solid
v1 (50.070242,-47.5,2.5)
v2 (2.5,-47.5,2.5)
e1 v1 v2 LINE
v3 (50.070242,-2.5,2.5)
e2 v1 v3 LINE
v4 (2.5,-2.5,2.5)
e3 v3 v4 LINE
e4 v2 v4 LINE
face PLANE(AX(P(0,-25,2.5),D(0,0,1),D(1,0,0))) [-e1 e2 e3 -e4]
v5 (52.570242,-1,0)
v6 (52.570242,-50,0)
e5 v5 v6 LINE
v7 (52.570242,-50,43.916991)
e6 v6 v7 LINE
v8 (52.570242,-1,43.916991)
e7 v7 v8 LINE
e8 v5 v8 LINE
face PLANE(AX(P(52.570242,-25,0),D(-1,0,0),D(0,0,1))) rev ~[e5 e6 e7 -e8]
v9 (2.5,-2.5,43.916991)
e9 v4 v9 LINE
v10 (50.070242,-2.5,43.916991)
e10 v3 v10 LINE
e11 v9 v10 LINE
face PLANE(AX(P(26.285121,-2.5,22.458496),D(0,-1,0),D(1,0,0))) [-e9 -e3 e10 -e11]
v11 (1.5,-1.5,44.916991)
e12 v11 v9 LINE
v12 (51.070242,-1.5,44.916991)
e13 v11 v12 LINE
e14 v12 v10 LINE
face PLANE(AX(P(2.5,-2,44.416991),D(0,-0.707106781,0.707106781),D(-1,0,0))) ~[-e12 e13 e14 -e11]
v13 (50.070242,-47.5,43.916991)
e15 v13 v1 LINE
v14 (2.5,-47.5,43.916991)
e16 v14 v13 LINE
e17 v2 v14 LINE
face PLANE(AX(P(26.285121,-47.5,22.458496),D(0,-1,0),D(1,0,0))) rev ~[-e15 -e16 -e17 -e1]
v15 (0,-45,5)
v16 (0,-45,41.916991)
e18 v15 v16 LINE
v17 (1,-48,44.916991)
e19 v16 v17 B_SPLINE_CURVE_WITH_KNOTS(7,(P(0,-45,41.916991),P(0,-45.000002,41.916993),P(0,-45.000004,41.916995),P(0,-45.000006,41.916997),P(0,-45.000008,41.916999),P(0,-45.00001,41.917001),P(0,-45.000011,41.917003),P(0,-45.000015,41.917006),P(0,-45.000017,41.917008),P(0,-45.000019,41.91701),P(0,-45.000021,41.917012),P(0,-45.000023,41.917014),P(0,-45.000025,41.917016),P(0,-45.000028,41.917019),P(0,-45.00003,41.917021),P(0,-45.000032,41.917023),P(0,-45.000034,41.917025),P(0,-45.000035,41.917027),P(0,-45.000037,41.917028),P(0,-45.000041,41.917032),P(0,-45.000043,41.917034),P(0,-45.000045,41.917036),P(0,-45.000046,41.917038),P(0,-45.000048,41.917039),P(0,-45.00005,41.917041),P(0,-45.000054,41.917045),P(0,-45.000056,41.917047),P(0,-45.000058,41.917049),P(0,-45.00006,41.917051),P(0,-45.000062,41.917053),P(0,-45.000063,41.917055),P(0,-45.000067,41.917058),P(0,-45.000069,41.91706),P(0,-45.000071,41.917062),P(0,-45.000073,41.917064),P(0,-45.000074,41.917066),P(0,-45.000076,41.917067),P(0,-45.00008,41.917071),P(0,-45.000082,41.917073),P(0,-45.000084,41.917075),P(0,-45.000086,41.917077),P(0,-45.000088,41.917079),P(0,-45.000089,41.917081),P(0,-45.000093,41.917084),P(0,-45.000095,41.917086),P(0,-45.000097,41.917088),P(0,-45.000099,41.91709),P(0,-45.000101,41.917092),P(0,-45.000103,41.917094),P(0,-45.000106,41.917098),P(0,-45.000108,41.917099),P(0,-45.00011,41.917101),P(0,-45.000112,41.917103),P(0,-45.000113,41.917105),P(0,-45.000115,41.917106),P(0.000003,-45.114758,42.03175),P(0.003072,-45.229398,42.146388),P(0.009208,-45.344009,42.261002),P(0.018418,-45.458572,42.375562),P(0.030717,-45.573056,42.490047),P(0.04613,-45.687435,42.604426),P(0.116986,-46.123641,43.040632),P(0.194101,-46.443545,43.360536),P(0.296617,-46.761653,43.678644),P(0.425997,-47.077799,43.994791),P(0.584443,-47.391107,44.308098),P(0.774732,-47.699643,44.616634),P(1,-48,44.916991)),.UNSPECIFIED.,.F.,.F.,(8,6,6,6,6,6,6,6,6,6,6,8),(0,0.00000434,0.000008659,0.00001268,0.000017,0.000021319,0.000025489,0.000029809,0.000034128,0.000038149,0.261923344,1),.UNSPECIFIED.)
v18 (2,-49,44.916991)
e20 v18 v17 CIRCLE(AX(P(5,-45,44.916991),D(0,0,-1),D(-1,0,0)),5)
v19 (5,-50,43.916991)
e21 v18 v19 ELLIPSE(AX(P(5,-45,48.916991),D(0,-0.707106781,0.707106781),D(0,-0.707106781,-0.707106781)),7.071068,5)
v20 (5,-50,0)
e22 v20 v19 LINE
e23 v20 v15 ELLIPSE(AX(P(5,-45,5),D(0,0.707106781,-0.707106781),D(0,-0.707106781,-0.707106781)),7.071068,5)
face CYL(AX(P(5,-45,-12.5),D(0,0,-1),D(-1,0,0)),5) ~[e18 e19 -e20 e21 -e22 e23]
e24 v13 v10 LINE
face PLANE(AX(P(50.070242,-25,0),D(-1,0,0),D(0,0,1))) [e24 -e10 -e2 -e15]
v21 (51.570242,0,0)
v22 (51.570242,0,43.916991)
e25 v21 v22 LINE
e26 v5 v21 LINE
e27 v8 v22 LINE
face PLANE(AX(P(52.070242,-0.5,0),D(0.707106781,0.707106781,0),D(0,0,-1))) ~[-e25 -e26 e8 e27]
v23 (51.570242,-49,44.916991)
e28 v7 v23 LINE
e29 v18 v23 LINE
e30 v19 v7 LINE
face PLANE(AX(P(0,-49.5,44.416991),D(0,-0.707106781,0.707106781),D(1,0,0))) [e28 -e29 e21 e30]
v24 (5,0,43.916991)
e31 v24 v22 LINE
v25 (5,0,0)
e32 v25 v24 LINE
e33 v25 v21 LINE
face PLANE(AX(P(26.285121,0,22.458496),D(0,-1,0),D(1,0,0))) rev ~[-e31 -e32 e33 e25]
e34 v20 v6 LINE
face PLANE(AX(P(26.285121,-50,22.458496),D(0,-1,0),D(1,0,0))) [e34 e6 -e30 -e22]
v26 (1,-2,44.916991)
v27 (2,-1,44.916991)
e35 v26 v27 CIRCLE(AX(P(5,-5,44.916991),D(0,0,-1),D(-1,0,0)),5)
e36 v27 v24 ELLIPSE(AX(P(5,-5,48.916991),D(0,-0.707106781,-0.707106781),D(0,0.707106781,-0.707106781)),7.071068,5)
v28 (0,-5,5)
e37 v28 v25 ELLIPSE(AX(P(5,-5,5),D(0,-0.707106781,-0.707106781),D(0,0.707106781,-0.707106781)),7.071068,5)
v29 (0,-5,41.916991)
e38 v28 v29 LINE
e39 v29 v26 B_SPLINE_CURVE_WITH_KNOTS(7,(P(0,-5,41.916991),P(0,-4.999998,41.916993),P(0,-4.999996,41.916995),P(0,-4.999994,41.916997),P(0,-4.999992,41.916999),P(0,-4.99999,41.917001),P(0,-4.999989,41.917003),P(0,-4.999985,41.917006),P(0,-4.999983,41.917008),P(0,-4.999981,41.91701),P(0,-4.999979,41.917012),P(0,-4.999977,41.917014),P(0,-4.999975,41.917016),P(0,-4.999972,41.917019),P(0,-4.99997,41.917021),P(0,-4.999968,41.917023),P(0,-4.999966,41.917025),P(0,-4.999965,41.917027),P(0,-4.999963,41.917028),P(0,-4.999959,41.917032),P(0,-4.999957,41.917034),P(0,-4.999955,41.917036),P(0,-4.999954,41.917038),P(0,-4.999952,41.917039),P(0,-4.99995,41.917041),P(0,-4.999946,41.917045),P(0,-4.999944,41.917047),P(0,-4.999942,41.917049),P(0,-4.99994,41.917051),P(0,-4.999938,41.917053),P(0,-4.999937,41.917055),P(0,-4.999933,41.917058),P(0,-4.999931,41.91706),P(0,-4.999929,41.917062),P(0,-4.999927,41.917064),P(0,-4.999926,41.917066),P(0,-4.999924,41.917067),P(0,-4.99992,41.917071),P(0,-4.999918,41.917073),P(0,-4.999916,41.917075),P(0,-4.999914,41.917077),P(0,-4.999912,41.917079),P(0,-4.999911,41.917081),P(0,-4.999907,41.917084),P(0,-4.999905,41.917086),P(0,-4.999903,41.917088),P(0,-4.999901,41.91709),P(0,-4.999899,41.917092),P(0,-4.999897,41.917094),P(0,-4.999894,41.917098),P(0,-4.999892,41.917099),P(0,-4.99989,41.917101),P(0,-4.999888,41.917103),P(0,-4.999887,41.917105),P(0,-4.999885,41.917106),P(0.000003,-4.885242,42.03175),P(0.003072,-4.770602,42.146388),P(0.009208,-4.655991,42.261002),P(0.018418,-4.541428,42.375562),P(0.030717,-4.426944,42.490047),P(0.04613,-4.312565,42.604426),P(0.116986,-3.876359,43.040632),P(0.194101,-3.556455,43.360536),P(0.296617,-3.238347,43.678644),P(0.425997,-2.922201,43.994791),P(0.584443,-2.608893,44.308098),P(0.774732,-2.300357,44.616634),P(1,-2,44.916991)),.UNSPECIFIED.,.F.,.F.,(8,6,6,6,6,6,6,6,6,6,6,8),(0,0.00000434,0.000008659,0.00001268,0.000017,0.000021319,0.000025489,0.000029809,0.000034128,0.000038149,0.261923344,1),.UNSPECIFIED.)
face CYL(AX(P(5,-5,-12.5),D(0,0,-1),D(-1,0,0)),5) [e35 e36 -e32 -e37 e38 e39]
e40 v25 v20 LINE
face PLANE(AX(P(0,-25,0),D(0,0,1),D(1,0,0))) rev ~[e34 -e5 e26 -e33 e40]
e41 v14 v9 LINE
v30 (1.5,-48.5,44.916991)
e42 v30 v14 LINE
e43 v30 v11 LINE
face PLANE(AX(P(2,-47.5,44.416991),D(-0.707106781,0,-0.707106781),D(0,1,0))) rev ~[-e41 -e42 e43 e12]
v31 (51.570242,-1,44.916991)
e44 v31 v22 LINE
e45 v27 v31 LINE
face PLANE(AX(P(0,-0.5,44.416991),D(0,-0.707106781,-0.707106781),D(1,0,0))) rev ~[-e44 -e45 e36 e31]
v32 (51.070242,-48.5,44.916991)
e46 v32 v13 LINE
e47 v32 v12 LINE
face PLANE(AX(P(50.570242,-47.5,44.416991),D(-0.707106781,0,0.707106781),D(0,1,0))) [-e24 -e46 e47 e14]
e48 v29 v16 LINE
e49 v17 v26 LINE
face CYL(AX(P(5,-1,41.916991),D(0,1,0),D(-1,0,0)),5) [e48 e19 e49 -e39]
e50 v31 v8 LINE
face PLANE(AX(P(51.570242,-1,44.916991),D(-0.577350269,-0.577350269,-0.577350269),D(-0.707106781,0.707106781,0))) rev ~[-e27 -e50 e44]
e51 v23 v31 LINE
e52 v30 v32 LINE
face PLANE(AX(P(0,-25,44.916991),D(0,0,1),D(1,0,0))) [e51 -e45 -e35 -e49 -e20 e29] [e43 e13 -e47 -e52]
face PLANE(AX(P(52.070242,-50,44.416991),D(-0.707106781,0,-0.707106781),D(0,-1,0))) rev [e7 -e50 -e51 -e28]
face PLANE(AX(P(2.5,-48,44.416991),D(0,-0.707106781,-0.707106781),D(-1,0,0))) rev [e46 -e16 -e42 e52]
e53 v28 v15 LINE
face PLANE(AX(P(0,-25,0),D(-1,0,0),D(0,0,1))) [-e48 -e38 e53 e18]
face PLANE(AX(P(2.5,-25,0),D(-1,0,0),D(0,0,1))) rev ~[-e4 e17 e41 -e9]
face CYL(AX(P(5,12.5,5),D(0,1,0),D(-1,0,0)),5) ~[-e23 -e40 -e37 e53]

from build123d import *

# Parameters (mm, degrees)
F0_W        = 52.5702424347
F0_H        = 44.9169911444
F1_DEPTH    = 25
F2_DEPTH    = 25
F3_T        = -2.5
F4_SIZE     = 1
F5_T1_DEPTH = 68.9169911444
F5_T3_DEPTH = 6.1776694265
F5_T5_DEPTH = 48.0000001753
F5_T7_DEPTH = 6.1776694575
F5_T9_DEPTH = 75


# Not quite as in the source:
# - a fillet or chamfer that OpenCascade refuses, or shapes differently, is made with other operations: its cross-section is extruded or revolved along the edge and cut away or added


with BuildPart() as f1:
    # F0 (on Front) → F1 (new body)
    with BuildSketch(Plane.XZ):
        with Locations((26.2851212174, 22.4584955722)):
            Rectangle(F0_W, F0_H)
    extrude(amount=F1_DEPTH)

    # F2 (add): a face of the model
    f2_faces = [f1.faces().sort_by_distance(p)[0] for p in [
        (26.2851212174, -25, 22.4584955722),
    ]]
    extrude(f2_faces, amount=F2_DEPTH)

    # F3
    f3_openings = [f1.faces().sort_by_distance(p)[0] for p in [
        (26.285121, -25, 44.916991),
    ]]
    offset(amount=F3_T, openings=f3_openings)

    # F4
    f4_edges = [f1.edges().sort_by_distance(p)[0] for p in [
        (52.570242, 0, 22.458496),
        (52.570242, -25, 44.916991),
        (26.285121, -50, 44.916991),
        (0, -25, 44.916991),
        (26.285121, 0, 44.916991),
        (2.5, -25, 44.916991),
        (26.285121, -47.5, 44.916991),
        (50.070242, -25, 44.916991),
        (26.285121, -2.5, 44.916991),
    ]]
    chamfer(f4_edges, length=F4_SIZE)

    # F5: fillet of radius 5 on 4 edges, made by hand

    # F5_s2 → F5_t1 (cut)
    with BuildSketch(Plane.XY.offset(-12.5)):
        with BuildLine():
            ThreePointArc((0, -45), (1.4644660941, -48.5355339059), (5, -50))
            Line((5, -50), (0, -50))
            Line((0, -50), (0, -45))
        make_face()
        with BuildLine():
            ThreePointArc((0, -5), (1.4644660941, -1.4644660941), (5, 0))
            Line((5, 0), (0, 0))
            Line((0, 0), (0, -5))
        make_face()
    extrude(amount=F5_T1_DEPTH, mode=Mode.SUBTRACT)

    # F5_s4 → F5_t3 (cut)
    with BuildSketch(Plane.XZ.offset(49.0000001032)):
        with BuildLine():
            ThreePointArc((0, 41.8459233326), (0.3806023374, 43.7593404944), (1.4644660941, 45.3814572385))
            Line((1.4644660941, 45.3814572385), (0, 43.9169911444))
            Line((0, 43.9169911444), (0, 41.8459233326))
        make_face()
    extrude(amount=F5_T3_DEPTH, mode=Mode.SUBTRACT)

    # F5_s6 → F5_t5 (cut)
    with BuildSketch(Plane.XZ.offset(0.9999999279)):
        with BuildLine():
            ThreePointArc((0, 41.9169911444), (0.2565835097, 43.4981299745), (1, 44.9169911444))
            Line((1, 44.9169911444), (0, 43.9169911444))
            Line((0, 43.9169911444), (0, 41.9169911444))
        make_face()
    extrude(amount=F5_T5_DEPTH, mode=Mode.SUBTRACT)

    # F5_s8 → F5_t7 (cut)
    with BuildSketch(Plane.XZ.offset(-5.1776695297)):
        with BuildLine():
            ThreePointArc((0, 41.8459233326), (0.3806023374, 43.7593404944), (1.4644660941, 45.3814572385))
            Line((1.4644660941, 45.3814572385), (0, 43.9169911444))
            Line((0, 43.9169911444), (0, 41.8459233326))
        make_face()
    extrude(amount=F5_T7_DEPTH, mode=Mode.SUBTRACT)

    # F5_s10 → F5_t9 (cut)
    with BuildSketch(Plane.XZ.offset(-12.5)):
        with BuildLine():
            ThreePointArc((0, 5), (1.4644660941, 1.4644660941), (5, 0))
            Line((5, 0), (0, 0))
            Line((0, 0), (0, 5))
        make_face()
    extrude(amount=F5_T9_DEPTH, mode=Mode.SUBTRACT)


solid = f1.part
